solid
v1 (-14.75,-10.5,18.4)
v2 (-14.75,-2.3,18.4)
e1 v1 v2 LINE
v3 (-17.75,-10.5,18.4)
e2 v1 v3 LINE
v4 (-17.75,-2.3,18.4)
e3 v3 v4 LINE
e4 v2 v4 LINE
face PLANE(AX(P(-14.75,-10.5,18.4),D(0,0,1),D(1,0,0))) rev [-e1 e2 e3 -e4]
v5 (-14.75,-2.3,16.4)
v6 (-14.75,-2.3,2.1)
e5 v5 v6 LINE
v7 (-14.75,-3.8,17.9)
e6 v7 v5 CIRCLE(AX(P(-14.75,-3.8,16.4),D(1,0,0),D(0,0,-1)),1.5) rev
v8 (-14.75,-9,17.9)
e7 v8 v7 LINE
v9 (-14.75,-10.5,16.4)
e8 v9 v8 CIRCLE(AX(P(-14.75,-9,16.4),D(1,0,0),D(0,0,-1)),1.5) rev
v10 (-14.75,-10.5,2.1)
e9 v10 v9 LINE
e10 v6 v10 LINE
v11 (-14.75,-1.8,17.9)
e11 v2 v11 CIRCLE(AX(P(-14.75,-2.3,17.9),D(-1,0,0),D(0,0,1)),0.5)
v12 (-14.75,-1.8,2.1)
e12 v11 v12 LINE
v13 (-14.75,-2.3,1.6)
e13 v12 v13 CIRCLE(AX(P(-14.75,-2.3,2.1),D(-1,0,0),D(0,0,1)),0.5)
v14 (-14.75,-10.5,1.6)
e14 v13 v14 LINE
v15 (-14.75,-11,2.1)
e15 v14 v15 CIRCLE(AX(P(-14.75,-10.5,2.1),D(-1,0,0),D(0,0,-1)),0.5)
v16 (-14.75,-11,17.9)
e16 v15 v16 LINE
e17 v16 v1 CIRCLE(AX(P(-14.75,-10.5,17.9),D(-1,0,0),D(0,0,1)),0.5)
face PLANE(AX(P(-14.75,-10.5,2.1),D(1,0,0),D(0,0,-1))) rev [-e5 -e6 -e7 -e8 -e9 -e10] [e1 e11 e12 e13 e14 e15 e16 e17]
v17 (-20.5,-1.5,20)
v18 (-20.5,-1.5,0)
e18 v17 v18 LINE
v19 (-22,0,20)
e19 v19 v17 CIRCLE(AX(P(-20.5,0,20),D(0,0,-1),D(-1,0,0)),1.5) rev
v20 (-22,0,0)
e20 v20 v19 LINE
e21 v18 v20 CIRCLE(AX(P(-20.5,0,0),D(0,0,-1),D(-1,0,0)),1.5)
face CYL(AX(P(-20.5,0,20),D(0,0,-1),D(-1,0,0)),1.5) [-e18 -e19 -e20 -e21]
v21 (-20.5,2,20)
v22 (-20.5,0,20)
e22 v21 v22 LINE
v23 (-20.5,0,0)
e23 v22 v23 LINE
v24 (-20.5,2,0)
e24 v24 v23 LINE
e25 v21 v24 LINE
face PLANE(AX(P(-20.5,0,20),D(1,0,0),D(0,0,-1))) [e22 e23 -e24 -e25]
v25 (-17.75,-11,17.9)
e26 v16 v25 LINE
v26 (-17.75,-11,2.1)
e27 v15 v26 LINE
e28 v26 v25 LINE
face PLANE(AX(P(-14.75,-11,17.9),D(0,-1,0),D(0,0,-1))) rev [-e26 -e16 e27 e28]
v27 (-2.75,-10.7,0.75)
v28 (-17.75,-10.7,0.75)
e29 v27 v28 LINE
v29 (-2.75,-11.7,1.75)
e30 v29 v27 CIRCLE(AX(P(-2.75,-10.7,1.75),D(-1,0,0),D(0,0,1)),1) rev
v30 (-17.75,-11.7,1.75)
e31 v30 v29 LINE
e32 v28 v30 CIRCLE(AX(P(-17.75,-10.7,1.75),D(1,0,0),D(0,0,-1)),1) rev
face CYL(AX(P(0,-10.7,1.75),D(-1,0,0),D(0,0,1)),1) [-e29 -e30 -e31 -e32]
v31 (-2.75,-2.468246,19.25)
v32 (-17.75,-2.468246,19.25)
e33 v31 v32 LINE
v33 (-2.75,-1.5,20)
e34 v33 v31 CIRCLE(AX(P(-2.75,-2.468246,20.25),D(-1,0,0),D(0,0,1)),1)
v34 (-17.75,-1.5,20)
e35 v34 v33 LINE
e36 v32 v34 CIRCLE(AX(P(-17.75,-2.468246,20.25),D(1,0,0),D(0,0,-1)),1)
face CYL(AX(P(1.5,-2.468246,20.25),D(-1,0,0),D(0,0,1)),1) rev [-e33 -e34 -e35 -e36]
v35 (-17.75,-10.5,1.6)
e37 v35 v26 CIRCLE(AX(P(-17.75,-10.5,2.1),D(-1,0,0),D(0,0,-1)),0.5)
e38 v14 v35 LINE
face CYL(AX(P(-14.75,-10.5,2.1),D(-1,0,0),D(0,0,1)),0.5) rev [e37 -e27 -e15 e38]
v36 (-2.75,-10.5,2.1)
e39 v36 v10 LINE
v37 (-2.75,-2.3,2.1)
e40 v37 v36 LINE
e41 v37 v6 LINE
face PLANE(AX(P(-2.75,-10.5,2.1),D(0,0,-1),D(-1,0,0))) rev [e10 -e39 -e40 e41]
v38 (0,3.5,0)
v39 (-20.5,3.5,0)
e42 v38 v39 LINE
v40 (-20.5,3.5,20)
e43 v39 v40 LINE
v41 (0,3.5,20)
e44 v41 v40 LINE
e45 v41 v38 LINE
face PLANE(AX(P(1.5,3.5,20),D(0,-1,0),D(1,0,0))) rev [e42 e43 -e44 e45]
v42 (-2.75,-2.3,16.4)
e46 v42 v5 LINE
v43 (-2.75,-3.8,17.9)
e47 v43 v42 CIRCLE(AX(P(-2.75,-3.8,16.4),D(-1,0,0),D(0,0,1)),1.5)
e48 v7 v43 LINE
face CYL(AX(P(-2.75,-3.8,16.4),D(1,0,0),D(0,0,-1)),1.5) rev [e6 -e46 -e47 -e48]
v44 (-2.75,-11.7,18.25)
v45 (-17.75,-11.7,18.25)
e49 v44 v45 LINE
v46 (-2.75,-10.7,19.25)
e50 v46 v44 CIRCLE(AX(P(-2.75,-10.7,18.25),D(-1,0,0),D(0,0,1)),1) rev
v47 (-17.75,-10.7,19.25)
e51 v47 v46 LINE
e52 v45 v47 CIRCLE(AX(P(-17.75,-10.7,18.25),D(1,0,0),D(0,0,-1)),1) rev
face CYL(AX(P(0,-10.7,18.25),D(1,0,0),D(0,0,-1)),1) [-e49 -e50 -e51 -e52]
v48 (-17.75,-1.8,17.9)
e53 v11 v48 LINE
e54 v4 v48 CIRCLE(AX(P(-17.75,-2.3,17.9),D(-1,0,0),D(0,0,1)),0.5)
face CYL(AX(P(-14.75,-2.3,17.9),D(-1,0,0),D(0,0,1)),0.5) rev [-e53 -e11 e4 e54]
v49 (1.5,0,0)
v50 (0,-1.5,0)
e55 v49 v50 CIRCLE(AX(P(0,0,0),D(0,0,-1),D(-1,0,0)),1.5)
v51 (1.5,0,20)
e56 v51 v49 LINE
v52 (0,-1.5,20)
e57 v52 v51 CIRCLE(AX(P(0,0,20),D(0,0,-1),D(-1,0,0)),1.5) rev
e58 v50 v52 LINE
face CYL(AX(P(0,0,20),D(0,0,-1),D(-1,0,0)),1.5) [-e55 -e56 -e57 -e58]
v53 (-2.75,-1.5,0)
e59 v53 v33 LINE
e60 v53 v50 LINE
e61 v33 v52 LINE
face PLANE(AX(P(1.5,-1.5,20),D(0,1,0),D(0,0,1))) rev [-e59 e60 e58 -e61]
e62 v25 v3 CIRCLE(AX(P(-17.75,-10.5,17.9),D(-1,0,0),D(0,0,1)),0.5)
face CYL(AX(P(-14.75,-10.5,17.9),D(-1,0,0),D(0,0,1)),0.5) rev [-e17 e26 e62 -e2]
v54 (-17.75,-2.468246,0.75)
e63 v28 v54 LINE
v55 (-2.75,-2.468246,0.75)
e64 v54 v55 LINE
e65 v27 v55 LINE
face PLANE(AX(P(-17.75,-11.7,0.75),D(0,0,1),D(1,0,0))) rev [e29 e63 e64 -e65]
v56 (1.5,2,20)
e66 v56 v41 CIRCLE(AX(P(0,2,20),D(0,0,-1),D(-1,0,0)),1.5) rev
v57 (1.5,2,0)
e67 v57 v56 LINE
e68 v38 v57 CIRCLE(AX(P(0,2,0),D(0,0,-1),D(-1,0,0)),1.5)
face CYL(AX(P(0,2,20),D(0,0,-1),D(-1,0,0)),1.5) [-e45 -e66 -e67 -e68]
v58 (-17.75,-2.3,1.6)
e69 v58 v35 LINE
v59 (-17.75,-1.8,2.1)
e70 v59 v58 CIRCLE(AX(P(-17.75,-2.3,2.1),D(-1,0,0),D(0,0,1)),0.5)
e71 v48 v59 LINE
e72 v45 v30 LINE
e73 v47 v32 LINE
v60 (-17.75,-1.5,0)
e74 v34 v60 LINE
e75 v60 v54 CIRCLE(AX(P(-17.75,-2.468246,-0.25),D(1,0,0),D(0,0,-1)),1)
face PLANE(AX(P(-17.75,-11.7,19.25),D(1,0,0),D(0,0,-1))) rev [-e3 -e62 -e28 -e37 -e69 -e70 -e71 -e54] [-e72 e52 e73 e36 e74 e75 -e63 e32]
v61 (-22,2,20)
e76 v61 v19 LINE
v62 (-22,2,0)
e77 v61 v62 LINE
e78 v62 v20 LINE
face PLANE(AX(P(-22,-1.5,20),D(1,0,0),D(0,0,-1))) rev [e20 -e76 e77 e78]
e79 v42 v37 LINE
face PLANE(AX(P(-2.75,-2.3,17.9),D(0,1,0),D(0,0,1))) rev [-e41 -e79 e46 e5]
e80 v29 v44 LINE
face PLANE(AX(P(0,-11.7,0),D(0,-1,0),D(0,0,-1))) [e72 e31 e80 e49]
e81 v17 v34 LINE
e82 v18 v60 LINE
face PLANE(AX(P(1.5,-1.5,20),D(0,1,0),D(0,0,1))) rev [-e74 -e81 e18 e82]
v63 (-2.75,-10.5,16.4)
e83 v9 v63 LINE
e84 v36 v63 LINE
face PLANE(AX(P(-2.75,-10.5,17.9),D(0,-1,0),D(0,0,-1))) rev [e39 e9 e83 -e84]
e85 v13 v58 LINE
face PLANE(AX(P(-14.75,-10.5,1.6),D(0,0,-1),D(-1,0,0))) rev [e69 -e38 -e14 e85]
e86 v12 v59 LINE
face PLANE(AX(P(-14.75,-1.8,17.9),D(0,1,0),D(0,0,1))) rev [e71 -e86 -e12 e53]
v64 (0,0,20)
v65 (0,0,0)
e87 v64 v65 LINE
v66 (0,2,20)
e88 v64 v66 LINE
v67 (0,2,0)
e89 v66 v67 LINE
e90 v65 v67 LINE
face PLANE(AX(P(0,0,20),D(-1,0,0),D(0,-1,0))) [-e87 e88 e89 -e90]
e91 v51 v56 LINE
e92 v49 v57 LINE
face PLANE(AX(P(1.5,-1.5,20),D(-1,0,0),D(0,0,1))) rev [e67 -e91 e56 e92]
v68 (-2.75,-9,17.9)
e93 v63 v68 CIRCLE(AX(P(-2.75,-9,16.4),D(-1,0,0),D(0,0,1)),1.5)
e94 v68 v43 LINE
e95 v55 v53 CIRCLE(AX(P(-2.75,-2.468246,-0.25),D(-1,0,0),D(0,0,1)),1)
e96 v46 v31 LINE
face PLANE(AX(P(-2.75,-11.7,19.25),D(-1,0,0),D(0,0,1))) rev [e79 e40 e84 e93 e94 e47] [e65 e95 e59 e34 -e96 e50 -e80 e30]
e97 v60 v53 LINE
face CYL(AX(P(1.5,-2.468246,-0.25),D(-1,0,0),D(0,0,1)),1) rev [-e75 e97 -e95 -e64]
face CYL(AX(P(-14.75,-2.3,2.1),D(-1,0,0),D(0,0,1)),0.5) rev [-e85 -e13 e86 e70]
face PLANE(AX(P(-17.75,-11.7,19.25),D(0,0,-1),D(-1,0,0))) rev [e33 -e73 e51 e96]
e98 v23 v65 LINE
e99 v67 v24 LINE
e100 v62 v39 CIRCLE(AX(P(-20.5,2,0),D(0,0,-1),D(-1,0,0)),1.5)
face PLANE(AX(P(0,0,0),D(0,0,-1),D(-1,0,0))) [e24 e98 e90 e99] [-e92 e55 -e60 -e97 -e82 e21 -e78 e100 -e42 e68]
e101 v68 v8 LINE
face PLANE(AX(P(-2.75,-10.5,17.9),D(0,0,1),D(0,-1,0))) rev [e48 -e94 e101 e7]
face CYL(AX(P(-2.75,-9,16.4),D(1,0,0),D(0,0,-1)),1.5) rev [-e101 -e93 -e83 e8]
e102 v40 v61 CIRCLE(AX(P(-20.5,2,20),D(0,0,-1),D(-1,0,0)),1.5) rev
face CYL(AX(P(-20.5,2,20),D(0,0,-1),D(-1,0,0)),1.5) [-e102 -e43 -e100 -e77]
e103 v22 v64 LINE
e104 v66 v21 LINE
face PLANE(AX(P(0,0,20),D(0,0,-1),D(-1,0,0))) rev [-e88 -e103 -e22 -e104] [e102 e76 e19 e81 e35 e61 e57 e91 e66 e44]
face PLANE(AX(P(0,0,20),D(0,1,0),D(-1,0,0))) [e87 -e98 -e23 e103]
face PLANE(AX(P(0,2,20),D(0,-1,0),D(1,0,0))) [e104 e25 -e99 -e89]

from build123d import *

# Parameters (mm, degrees)
CROQUIS1_W              = 23.5
CROQUIS1_H              = 5
CROQUIS1_W_2            = 20.5
CROQUIS1_H_2            = 2
SALIENTE_EXTRUIR1_DEPTH = 20
CROQUIS5_W              = 15
CROQUIS5_H              = 18.5
SALIENTE_EXTRUIR3_DEPTH = 10.2
CROQUIS6_W              = 15.8
CROQUIS6_H              = 8.2
CORTAR_EXTRUIR2_DEPTH   = 15
REDONDEO3_R             = 1.5
CORTAR_EXTRUIR3_DEPTH   = 3
REDONDEO4_R             = 1
REDONDEO5_R             = 1.5


with BuildPart() as part:
    # Croquis1 → Saliente-Extruir1 (new body)
    with BuildSketch(Plane.XY):
        with Locations((-10.25, 1)):
            Rectangle(CROQUIS1_W, CROQUIS1_H)
        with Locations((-10.25, 1)):
            Rectangle(CROQUIS1_W_2, CROQUIS1_H_2, mode=Mode.SUBTRACT)
    extrude(amount=SALIENTE_EXTRUIR1_DEPTH)

    # Croquis5 → Saliente-Extruir3 (add)
    with BuildSketch(Plane.XZ.offset(1.5)):
        with Locations((-10.25, 10)):
            Rectangle(CROQUIS5_W, CROQUIS5_H)
    extrude(amount=SALIENTE_EXTRUIR3_DEPTH)

    # Croquis6 → Cortar-Extruir2 (cut)
    with BuildSketch(Plane.ZY.offset(17.75)):
        with Locations((10, -6.4)):
            Rectangle(CROQUIS6_W, CROQUIS6_H)
    extrude(amount=-CORTAR_EXTRUIR2_DEPTH, mode=Mode.SUBTRACT)

    # Redondeo3
    redondeo3_edges = [part.edges().sort_by_distance(p)[0] for p in [
        (-10.25, -2.3, 17.9),
        (-10.25, -10.5, 17.9),
    ]]
    fillet(redondeo3_edges, radius=REDONDEO3_R)

    # Croquis7 → Cortar-Extruir3 (cut)
    with BuildSketch(Plane.ZY.offset(17.75)):
        with BuildLine():
            Line((17.9, -11), (2.1, -11))
            ThreePointArc((2.1, -11), (1.746446609, -10.853553391), (1.6, -10.5))
            Line((1.6, -10.5), (1.6, -2.3))
            ThreePointArc((1.6, -2.3), (1.746446609, -1.946446609), (2.1, -1.8))
            Line((2.1, -1.8), (17.9, -1.8))
            ThreePointArc((17.9, -1.8), (18.253553391, -1.946446609), (18.4, -2.3))
            Line((18.4, -2.3), (18.4, -10.5))
            ThreePointArc((18.4, -10.5), (18.253553391, -10.853553391), (17.9, -11))
        make_face()
    extrude(amount=-CORTAR_EXTRUIR3_DEPTH, mode=Mode.SUBTRACT)

    # Redondeo4
    # the kernel refuses this fillet: 1 mm, written as the material it adds along each edge
    with BuildSketch(Plane(origin=(-2.75, -1.5, 0.75), x_dir=(0, 0, -1), z_dir=(-1, 0, 0))) as redondeo4_piece_1:
        with BuildLine():
            CenterArc((1, 0.968245837), REDONDEO4_R, 180, 75.522487814)
            Line((0, 0.968245837), (0, 0))
            Line((0, 0), (0.75, 0))
        make_face()
    extrude(amount=15)
    with BuildSketch(Plane(origin=(-17.75, -1.5, 19.25), x_dir=(0, -1, 0), z_dir=(1, 0, 0))) as redondeo4_piece_2:
        with BuildLine():
            CenterArc((0.968245837, -1), REDONDEO4_R, 90, 75.522487814)
            Line((0, -0.75), (0, 0))
            Line((0, 0), (0.968245837, 0))
        make_face()
    extrude(amount=15)
    # the kernel refuses this fillet: 1 mm, written as the material it takes off along each edge
    with BuildSketch(Plane(origin=(-0.25, -11.7, 0.75), x_dir=(0, 1, 0), z_dir=(-1, 0, 0))) as redondeo4_2_piece_1:
        with BuildLine():
            CenterArc((REDONDEO4_R, -REDONDEO4_R), REDONDEO4_R, 90, 90)
            Line((0, -REDONDEO4_R), (0, 0))
            Line((0, 0), (REDONDEO4_R, 0))
        make_face()
    extrude(amount=20, mode=Mode.SUBTRACT)
    with BuildSketch(Plane(origin=(-20.25, -11.7, 19.25), x_dir=(0, 0, -1), z_dir=(1, 0, 0))) as redondeo4_2_piece_2:
        with BuildLine():
            CenterArc((REDONDEO4_R, REDONDEO4_R), REDONDEO4_R, 180, 90)
            Line((0, REDONDEO4_R), (0, 0))
            Line((0, 0), (REDONDEO4_R, 0))
        make_face()
    extrude(amount=20, mode=Mode.SUBTRACT)

    # Redondeo5
    redondeo5_edges = [part.edges().sort_by_distance(p)[0] for p in [
        (-22, -1.5, 10),
        (-22, 3.5, 10),
        (1.5, 3.5, 10),
        (1.5, -1.5, 10),
    ]]
    fillet(redondeo5_edges, radius=REDONDEO5_R)


solid = part.part
